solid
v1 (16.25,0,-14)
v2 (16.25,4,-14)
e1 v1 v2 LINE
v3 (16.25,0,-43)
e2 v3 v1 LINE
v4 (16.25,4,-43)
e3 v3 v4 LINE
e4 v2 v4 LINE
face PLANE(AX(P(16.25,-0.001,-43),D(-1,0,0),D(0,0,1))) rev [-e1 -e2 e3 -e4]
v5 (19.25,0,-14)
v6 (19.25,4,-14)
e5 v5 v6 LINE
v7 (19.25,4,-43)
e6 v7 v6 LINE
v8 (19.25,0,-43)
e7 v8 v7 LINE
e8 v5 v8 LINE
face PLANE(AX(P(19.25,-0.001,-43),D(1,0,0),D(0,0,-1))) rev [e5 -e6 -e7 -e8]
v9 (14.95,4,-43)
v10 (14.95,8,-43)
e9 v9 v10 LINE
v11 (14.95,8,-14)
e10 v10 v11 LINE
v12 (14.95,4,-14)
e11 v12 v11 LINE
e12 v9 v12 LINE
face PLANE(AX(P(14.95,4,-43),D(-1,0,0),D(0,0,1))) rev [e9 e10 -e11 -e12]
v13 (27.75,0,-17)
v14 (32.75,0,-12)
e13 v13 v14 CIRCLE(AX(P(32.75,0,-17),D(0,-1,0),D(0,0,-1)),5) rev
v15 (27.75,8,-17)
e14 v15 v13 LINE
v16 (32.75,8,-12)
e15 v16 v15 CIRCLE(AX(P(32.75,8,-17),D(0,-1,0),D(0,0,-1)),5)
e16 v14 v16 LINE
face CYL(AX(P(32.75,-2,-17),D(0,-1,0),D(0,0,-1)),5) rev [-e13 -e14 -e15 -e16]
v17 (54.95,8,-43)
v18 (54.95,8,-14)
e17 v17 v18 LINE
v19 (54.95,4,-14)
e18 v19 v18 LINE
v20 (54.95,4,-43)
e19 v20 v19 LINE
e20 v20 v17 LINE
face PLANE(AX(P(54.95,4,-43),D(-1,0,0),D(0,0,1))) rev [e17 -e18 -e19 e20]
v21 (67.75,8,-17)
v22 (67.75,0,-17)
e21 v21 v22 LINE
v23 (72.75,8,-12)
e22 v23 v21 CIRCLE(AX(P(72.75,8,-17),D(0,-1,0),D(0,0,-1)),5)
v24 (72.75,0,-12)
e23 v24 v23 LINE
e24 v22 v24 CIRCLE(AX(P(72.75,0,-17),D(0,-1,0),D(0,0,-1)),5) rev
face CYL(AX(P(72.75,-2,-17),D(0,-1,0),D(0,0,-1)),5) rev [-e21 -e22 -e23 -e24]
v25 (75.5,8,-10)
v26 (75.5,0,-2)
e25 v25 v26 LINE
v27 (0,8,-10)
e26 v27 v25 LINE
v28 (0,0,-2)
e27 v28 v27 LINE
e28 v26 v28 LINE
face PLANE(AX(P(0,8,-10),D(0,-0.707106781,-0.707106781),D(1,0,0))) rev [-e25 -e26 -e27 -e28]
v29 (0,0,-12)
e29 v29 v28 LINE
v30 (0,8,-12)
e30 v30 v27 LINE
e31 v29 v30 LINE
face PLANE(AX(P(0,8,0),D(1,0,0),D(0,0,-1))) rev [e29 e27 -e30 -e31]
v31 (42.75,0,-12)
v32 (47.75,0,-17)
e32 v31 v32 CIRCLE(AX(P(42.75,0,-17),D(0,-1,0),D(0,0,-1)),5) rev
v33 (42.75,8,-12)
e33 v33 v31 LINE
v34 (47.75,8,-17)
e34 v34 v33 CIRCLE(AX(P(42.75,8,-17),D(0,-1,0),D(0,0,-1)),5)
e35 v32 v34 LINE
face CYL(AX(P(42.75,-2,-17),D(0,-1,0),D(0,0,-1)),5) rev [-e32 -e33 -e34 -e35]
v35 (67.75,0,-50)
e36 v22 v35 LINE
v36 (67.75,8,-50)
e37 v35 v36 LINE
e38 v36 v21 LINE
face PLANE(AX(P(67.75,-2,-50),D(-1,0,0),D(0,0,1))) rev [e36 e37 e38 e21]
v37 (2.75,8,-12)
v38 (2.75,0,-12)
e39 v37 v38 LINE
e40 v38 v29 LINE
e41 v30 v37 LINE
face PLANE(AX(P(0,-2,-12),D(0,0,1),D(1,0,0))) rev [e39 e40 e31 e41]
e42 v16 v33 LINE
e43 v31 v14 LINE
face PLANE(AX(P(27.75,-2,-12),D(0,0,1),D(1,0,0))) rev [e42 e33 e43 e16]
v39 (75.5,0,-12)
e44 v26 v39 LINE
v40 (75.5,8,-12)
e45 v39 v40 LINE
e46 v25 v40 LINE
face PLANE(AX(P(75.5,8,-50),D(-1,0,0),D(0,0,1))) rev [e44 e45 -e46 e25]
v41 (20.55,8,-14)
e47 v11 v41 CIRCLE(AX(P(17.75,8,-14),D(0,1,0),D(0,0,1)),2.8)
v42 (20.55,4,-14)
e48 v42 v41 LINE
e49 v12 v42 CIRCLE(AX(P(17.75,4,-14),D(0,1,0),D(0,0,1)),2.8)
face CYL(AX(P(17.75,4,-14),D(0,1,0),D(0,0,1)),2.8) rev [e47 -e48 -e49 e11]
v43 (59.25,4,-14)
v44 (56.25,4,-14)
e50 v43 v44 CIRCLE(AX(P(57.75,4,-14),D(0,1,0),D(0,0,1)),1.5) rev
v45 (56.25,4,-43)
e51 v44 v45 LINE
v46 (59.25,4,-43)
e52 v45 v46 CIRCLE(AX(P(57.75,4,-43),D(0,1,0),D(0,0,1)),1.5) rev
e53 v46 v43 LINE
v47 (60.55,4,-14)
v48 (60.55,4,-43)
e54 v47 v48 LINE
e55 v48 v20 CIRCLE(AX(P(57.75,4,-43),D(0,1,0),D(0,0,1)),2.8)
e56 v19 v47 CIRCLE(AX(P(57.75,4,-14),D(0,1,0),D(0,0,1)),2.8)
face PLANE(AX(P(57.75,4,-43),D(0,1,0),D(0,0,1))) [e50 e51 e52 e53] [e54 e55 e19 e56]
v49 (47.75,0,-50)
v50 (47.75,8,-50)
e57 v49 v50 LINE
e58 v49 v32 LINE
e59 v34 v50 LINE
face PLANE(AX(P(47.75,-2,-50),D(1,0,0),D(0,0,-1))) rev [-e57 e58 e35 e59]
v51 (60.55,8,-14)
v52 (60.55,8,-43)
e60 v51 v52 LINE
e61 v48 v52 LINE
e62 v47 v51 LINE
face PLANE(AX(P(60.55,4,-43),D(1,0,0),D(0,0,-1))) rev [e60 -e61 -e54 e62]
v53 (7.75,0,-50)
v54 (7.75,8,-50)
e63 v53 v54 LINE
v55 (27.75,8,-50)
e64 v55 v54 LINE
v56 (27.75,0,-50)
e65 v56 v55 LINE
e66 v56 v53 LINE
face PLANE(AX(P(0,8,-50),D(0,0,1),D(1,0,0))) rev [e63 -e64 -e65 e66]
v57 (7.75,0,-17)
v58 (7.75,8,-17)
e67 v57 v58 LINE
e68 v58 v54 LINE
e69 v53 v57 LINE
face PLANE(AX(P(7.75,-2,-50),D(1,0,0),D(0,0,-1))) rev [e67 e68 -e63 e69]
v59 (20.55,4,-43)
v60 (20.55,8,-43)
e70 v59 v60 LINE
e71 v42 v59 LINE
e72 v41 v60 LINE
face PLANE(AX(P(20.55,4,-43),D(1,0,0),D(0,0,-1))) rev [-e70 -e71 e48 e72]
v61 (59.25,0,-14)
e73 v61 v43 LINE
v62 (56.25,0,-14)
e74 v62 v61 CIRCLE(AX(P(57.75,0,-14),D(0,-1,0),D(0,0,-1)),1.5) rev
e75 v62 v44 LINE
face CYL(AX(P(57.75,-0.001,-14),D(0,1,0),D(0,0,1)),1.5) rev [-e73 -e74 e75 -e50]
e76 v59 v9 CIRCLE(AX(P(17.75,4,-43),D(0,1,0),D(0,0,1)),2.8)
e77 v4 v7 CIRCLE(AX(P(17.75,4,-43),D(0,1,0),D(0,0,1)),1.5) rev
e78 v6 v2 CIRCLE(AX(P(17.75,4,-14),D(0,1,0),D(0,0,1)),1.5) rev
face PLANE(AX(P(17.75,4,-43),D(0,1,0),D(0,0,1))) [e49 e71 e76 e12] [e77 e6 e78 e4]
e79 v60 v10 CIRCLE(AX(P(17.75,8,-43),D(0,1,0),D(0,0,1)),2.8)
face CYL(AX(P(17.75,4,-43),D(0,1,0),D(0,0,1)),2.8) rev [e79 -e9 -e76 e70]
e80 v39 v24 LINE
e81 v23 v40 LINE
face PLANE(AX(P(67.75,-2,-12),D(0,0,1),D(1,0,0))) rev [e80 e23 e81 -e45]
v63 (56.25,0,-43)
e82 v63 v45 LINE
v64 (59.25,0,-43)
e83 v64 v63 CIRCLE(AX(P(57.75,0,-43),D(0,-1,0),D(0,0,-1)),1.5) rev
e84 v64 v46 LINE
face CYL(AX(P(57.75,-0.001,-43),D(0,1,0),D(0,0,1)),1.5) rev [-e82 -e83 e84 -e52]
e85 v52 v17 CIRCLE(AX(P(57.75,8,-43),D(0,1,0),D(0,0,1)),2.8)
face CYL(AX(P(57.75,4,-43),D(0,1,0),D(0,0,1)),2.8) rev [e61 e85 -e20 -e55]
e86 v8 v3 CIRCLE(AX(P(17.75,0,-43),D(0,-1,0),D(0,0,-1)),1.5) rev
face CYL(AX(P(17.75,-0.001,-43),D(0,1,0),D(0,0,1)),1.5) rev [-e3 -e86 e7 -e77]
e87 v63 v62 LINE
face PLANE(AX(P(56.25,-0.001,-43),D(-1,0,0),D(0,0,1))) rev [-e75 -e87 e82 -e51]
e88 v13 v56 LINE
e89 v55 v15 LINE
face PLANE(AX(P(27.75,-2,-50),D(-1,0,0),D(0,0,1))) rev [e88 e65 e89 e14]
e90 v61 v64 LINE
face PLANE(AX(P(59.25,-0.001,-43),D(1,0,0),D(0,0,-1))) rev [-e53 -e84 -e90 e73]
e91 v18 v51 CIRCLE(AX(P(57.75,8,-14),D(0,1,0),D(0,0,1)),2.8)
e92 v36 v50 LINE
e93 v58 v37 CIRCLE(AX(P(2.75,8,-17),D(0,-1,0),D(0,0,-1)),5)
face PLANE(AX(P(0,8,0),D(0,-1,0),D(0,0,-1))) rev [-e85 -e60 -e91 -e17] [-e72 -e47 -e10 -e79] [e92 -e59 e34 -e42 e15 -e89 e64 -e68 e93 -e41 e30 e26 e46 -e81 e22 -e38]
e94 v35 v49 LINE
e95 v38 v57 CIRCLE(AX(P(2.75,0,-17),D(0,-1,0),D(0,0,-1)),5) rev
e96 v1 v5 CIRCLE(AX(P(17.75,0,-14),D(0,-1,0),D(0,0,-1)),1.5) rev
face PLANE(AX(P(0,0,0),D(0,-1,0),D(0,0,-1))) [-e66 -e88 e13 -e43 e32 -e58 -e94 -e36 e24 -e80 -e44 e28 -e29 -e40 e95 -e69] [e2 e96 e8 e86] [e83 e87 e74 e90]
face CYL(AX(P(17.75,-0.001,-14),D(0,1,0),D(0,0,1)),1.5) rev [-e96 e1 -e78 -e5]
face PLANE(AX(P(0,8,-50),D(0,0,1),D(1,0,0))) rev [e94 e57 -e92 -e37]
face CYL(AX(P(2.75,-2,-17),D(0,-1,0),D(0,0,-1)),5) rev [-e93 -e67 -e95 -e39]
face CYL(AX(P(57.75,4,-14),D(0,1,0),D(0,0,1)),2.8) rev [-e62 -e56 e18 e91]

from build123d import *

# Parameters (mm, degrees)
BOSS_EXTRUDE1_DEPTH = 8
CUT_EXTRUDE2_REACH  = 92.908
SKETCH5_W           = 20
SKETCH5_H           = 38
SKETCH5_W_2         = 7.75
CUT_EXTRUDE3_DEPTH  = 10
FILLET1_R           = 5
CHAMFER1_SIZE       = 10
CUT_EXTRUDE4_DEPTH  = 4


with BuildPart() as part:
    # Sketch1 → Boss-Extrude1 (new body)
    with BuildSketch(Plane(origin=(0, 0, 0), x_dir=(1, 0, 0), z_dir=(0, 1, 0))):
        Polygon((0, 0), (0, 50), (75.5, 50), (75.5, 0), (37.75, 0), align=None)
    extrude(amount=BOSS_EXTRUDE1_DEPTH)

    # Sketch4 → Cut-Extrude2 (cut, up to next)
    with BuildSketch(Plane(origin=(0, 8, 0), x_dir=(1, 0, 0), z_dir=(0, 1, 0)), mode=Mode.PRIVATE) as cut_extrude2_sk1:
        with BuildLine():
            Line((19.25, 43), (19.25, 14))
            ThreePointArc((19.25, 14), (17.75, 12.5), (16.25, 14))
            Line((16.25, 14), (16.25, 43))
            ThreePointArc((16.25, 43), (17.75, 44.5), (19.25, 43))
        make_face()
    cut_extrude2_tool1 = extrude(cut_extrude2_sk1.sketch, amount=-CUT_EXTRUDE2_REACH, mode=Mode.PRIVATE) & part.part
    # Sketch4 → Cut-Extrude2 (cut, up to next)
    with BuildSketch(Plane(origin=(0, 8, 0), x_dir=(1, 0, 0), z_dir=(0, 1, 0)), mode=Mode.PRIVATE) as cut_extrude2_sk2:
        with BuildLine():
            Line((59.25, 43), (59.25, 14))
            ThreePointArc((59.25, 14), (57.75, 12.5), (56.25, 14))
            Line((56.25, 14), (56.25, 43))
            ThreePointArc((56.25, 43), (57.75, 44.5), (59.25, 43))
        make_face()
    cut_extrude2_tool2 = extrude(cut_extrude2_sk2.sketch, amount=-CUT_EXTRUDE2_REACH, mode=Mode.PRIVATE) & part.part
    add(cut_extrude2_tool1.solids().sort_by_distance((17.75, 8, -28.5))[0], mode=Mode.SUBTRACT)
    add(cut_extrude2_tool2.solids().sort_by_distance((57.75, 8, -28.5))[0], mode=Mode.SUBTRACT)

    # Sketch5 → Cut-Extrude3 (cut)
    with BuildSketch(Plane(origin=(0, 8, 0), x_dir=(1, 0, 0), z_dir=(0, 1, 0))):
        with Locations((37.75, 31)):
            Rectangle(SKETCH5_W, SKETCH5_H)
        with Locations((71.625, 31)):
            Rectangle(SKETCH5_W_2, SKETCH5_H)
        with Locations((3.875, 31)):
            Rectangle(SKETCH5_W_2, SKETCH5_H)
    extrude(amount=-CUT_EXTRUDE3_DEPTH, mode=Mode.SUBTRACT)

    # Fillet1
    fillet1_edges = [part.edges().sort_by_distance(p)[0] for p in [
        (27.75, 4, -12),
        (47.75, 4, -12),
        (7.75, 4, -12),
        (67.75, 4, -12),
    ]]
    fillet(fillet1_edges, radius=FILLET1_R)

    # Chamfer1
    # the kernel refuses this chamfer: 10 mm, written as the material it takes off along each edge
    with BuildSketch(Plane(origin=(101.21682988, 8, 0), x_dir=(0, -0.9996219169112968, 0.027495876610586372), z_dir=(-1, 0, 0))) as chamfer1_piece_1:
        Polygon((CHAMFER1_SIZE * 0.999621916911, -CHAMFER1_SIZE * 0.0274958766106), (-CHAMFER1_SIZE * 0.0274958766106, -CHAMFER1_SIZE * 0.999621916911), (0, 0), align=None)
    extrude(amount=126.933659759, mode=Mode.SUBTRACT)

    # Sketch7 → Cut-Extrude4 (cut)
    with BuildSketch(Plane(origin=(0, 8, 0), x_dir=(1, 0, 0), z_dir=(0, 1, 0))):
        with BuildLine():
            Line((20.55, 43), (20.55, 14))
            ThreePointArc((20.55, 14), (17.75, 11.2), (14.95, 14))
            Line((14.95, 14), (14.95, 43))
            ThreePointArc((14.95, 43), (17.75, 45.8), (20.55, 43))
        make_face()
        with BuildLine():
            Line((60.55, 43), (60.55, 14))
            ThreePointArc((60.55, 14), (57.75, 11.2), (54.95, 14))
            Line((54.95, 14), (54.95, 43))
            ThreePointArc((54.95, 43), (57.75, 45.8), (60.55, 43))
        make_face()
    extrude(amount=-CUT_EXTRUDE4_DEPTH, mode=Mode.SUBTRACT)


solid = part.part
